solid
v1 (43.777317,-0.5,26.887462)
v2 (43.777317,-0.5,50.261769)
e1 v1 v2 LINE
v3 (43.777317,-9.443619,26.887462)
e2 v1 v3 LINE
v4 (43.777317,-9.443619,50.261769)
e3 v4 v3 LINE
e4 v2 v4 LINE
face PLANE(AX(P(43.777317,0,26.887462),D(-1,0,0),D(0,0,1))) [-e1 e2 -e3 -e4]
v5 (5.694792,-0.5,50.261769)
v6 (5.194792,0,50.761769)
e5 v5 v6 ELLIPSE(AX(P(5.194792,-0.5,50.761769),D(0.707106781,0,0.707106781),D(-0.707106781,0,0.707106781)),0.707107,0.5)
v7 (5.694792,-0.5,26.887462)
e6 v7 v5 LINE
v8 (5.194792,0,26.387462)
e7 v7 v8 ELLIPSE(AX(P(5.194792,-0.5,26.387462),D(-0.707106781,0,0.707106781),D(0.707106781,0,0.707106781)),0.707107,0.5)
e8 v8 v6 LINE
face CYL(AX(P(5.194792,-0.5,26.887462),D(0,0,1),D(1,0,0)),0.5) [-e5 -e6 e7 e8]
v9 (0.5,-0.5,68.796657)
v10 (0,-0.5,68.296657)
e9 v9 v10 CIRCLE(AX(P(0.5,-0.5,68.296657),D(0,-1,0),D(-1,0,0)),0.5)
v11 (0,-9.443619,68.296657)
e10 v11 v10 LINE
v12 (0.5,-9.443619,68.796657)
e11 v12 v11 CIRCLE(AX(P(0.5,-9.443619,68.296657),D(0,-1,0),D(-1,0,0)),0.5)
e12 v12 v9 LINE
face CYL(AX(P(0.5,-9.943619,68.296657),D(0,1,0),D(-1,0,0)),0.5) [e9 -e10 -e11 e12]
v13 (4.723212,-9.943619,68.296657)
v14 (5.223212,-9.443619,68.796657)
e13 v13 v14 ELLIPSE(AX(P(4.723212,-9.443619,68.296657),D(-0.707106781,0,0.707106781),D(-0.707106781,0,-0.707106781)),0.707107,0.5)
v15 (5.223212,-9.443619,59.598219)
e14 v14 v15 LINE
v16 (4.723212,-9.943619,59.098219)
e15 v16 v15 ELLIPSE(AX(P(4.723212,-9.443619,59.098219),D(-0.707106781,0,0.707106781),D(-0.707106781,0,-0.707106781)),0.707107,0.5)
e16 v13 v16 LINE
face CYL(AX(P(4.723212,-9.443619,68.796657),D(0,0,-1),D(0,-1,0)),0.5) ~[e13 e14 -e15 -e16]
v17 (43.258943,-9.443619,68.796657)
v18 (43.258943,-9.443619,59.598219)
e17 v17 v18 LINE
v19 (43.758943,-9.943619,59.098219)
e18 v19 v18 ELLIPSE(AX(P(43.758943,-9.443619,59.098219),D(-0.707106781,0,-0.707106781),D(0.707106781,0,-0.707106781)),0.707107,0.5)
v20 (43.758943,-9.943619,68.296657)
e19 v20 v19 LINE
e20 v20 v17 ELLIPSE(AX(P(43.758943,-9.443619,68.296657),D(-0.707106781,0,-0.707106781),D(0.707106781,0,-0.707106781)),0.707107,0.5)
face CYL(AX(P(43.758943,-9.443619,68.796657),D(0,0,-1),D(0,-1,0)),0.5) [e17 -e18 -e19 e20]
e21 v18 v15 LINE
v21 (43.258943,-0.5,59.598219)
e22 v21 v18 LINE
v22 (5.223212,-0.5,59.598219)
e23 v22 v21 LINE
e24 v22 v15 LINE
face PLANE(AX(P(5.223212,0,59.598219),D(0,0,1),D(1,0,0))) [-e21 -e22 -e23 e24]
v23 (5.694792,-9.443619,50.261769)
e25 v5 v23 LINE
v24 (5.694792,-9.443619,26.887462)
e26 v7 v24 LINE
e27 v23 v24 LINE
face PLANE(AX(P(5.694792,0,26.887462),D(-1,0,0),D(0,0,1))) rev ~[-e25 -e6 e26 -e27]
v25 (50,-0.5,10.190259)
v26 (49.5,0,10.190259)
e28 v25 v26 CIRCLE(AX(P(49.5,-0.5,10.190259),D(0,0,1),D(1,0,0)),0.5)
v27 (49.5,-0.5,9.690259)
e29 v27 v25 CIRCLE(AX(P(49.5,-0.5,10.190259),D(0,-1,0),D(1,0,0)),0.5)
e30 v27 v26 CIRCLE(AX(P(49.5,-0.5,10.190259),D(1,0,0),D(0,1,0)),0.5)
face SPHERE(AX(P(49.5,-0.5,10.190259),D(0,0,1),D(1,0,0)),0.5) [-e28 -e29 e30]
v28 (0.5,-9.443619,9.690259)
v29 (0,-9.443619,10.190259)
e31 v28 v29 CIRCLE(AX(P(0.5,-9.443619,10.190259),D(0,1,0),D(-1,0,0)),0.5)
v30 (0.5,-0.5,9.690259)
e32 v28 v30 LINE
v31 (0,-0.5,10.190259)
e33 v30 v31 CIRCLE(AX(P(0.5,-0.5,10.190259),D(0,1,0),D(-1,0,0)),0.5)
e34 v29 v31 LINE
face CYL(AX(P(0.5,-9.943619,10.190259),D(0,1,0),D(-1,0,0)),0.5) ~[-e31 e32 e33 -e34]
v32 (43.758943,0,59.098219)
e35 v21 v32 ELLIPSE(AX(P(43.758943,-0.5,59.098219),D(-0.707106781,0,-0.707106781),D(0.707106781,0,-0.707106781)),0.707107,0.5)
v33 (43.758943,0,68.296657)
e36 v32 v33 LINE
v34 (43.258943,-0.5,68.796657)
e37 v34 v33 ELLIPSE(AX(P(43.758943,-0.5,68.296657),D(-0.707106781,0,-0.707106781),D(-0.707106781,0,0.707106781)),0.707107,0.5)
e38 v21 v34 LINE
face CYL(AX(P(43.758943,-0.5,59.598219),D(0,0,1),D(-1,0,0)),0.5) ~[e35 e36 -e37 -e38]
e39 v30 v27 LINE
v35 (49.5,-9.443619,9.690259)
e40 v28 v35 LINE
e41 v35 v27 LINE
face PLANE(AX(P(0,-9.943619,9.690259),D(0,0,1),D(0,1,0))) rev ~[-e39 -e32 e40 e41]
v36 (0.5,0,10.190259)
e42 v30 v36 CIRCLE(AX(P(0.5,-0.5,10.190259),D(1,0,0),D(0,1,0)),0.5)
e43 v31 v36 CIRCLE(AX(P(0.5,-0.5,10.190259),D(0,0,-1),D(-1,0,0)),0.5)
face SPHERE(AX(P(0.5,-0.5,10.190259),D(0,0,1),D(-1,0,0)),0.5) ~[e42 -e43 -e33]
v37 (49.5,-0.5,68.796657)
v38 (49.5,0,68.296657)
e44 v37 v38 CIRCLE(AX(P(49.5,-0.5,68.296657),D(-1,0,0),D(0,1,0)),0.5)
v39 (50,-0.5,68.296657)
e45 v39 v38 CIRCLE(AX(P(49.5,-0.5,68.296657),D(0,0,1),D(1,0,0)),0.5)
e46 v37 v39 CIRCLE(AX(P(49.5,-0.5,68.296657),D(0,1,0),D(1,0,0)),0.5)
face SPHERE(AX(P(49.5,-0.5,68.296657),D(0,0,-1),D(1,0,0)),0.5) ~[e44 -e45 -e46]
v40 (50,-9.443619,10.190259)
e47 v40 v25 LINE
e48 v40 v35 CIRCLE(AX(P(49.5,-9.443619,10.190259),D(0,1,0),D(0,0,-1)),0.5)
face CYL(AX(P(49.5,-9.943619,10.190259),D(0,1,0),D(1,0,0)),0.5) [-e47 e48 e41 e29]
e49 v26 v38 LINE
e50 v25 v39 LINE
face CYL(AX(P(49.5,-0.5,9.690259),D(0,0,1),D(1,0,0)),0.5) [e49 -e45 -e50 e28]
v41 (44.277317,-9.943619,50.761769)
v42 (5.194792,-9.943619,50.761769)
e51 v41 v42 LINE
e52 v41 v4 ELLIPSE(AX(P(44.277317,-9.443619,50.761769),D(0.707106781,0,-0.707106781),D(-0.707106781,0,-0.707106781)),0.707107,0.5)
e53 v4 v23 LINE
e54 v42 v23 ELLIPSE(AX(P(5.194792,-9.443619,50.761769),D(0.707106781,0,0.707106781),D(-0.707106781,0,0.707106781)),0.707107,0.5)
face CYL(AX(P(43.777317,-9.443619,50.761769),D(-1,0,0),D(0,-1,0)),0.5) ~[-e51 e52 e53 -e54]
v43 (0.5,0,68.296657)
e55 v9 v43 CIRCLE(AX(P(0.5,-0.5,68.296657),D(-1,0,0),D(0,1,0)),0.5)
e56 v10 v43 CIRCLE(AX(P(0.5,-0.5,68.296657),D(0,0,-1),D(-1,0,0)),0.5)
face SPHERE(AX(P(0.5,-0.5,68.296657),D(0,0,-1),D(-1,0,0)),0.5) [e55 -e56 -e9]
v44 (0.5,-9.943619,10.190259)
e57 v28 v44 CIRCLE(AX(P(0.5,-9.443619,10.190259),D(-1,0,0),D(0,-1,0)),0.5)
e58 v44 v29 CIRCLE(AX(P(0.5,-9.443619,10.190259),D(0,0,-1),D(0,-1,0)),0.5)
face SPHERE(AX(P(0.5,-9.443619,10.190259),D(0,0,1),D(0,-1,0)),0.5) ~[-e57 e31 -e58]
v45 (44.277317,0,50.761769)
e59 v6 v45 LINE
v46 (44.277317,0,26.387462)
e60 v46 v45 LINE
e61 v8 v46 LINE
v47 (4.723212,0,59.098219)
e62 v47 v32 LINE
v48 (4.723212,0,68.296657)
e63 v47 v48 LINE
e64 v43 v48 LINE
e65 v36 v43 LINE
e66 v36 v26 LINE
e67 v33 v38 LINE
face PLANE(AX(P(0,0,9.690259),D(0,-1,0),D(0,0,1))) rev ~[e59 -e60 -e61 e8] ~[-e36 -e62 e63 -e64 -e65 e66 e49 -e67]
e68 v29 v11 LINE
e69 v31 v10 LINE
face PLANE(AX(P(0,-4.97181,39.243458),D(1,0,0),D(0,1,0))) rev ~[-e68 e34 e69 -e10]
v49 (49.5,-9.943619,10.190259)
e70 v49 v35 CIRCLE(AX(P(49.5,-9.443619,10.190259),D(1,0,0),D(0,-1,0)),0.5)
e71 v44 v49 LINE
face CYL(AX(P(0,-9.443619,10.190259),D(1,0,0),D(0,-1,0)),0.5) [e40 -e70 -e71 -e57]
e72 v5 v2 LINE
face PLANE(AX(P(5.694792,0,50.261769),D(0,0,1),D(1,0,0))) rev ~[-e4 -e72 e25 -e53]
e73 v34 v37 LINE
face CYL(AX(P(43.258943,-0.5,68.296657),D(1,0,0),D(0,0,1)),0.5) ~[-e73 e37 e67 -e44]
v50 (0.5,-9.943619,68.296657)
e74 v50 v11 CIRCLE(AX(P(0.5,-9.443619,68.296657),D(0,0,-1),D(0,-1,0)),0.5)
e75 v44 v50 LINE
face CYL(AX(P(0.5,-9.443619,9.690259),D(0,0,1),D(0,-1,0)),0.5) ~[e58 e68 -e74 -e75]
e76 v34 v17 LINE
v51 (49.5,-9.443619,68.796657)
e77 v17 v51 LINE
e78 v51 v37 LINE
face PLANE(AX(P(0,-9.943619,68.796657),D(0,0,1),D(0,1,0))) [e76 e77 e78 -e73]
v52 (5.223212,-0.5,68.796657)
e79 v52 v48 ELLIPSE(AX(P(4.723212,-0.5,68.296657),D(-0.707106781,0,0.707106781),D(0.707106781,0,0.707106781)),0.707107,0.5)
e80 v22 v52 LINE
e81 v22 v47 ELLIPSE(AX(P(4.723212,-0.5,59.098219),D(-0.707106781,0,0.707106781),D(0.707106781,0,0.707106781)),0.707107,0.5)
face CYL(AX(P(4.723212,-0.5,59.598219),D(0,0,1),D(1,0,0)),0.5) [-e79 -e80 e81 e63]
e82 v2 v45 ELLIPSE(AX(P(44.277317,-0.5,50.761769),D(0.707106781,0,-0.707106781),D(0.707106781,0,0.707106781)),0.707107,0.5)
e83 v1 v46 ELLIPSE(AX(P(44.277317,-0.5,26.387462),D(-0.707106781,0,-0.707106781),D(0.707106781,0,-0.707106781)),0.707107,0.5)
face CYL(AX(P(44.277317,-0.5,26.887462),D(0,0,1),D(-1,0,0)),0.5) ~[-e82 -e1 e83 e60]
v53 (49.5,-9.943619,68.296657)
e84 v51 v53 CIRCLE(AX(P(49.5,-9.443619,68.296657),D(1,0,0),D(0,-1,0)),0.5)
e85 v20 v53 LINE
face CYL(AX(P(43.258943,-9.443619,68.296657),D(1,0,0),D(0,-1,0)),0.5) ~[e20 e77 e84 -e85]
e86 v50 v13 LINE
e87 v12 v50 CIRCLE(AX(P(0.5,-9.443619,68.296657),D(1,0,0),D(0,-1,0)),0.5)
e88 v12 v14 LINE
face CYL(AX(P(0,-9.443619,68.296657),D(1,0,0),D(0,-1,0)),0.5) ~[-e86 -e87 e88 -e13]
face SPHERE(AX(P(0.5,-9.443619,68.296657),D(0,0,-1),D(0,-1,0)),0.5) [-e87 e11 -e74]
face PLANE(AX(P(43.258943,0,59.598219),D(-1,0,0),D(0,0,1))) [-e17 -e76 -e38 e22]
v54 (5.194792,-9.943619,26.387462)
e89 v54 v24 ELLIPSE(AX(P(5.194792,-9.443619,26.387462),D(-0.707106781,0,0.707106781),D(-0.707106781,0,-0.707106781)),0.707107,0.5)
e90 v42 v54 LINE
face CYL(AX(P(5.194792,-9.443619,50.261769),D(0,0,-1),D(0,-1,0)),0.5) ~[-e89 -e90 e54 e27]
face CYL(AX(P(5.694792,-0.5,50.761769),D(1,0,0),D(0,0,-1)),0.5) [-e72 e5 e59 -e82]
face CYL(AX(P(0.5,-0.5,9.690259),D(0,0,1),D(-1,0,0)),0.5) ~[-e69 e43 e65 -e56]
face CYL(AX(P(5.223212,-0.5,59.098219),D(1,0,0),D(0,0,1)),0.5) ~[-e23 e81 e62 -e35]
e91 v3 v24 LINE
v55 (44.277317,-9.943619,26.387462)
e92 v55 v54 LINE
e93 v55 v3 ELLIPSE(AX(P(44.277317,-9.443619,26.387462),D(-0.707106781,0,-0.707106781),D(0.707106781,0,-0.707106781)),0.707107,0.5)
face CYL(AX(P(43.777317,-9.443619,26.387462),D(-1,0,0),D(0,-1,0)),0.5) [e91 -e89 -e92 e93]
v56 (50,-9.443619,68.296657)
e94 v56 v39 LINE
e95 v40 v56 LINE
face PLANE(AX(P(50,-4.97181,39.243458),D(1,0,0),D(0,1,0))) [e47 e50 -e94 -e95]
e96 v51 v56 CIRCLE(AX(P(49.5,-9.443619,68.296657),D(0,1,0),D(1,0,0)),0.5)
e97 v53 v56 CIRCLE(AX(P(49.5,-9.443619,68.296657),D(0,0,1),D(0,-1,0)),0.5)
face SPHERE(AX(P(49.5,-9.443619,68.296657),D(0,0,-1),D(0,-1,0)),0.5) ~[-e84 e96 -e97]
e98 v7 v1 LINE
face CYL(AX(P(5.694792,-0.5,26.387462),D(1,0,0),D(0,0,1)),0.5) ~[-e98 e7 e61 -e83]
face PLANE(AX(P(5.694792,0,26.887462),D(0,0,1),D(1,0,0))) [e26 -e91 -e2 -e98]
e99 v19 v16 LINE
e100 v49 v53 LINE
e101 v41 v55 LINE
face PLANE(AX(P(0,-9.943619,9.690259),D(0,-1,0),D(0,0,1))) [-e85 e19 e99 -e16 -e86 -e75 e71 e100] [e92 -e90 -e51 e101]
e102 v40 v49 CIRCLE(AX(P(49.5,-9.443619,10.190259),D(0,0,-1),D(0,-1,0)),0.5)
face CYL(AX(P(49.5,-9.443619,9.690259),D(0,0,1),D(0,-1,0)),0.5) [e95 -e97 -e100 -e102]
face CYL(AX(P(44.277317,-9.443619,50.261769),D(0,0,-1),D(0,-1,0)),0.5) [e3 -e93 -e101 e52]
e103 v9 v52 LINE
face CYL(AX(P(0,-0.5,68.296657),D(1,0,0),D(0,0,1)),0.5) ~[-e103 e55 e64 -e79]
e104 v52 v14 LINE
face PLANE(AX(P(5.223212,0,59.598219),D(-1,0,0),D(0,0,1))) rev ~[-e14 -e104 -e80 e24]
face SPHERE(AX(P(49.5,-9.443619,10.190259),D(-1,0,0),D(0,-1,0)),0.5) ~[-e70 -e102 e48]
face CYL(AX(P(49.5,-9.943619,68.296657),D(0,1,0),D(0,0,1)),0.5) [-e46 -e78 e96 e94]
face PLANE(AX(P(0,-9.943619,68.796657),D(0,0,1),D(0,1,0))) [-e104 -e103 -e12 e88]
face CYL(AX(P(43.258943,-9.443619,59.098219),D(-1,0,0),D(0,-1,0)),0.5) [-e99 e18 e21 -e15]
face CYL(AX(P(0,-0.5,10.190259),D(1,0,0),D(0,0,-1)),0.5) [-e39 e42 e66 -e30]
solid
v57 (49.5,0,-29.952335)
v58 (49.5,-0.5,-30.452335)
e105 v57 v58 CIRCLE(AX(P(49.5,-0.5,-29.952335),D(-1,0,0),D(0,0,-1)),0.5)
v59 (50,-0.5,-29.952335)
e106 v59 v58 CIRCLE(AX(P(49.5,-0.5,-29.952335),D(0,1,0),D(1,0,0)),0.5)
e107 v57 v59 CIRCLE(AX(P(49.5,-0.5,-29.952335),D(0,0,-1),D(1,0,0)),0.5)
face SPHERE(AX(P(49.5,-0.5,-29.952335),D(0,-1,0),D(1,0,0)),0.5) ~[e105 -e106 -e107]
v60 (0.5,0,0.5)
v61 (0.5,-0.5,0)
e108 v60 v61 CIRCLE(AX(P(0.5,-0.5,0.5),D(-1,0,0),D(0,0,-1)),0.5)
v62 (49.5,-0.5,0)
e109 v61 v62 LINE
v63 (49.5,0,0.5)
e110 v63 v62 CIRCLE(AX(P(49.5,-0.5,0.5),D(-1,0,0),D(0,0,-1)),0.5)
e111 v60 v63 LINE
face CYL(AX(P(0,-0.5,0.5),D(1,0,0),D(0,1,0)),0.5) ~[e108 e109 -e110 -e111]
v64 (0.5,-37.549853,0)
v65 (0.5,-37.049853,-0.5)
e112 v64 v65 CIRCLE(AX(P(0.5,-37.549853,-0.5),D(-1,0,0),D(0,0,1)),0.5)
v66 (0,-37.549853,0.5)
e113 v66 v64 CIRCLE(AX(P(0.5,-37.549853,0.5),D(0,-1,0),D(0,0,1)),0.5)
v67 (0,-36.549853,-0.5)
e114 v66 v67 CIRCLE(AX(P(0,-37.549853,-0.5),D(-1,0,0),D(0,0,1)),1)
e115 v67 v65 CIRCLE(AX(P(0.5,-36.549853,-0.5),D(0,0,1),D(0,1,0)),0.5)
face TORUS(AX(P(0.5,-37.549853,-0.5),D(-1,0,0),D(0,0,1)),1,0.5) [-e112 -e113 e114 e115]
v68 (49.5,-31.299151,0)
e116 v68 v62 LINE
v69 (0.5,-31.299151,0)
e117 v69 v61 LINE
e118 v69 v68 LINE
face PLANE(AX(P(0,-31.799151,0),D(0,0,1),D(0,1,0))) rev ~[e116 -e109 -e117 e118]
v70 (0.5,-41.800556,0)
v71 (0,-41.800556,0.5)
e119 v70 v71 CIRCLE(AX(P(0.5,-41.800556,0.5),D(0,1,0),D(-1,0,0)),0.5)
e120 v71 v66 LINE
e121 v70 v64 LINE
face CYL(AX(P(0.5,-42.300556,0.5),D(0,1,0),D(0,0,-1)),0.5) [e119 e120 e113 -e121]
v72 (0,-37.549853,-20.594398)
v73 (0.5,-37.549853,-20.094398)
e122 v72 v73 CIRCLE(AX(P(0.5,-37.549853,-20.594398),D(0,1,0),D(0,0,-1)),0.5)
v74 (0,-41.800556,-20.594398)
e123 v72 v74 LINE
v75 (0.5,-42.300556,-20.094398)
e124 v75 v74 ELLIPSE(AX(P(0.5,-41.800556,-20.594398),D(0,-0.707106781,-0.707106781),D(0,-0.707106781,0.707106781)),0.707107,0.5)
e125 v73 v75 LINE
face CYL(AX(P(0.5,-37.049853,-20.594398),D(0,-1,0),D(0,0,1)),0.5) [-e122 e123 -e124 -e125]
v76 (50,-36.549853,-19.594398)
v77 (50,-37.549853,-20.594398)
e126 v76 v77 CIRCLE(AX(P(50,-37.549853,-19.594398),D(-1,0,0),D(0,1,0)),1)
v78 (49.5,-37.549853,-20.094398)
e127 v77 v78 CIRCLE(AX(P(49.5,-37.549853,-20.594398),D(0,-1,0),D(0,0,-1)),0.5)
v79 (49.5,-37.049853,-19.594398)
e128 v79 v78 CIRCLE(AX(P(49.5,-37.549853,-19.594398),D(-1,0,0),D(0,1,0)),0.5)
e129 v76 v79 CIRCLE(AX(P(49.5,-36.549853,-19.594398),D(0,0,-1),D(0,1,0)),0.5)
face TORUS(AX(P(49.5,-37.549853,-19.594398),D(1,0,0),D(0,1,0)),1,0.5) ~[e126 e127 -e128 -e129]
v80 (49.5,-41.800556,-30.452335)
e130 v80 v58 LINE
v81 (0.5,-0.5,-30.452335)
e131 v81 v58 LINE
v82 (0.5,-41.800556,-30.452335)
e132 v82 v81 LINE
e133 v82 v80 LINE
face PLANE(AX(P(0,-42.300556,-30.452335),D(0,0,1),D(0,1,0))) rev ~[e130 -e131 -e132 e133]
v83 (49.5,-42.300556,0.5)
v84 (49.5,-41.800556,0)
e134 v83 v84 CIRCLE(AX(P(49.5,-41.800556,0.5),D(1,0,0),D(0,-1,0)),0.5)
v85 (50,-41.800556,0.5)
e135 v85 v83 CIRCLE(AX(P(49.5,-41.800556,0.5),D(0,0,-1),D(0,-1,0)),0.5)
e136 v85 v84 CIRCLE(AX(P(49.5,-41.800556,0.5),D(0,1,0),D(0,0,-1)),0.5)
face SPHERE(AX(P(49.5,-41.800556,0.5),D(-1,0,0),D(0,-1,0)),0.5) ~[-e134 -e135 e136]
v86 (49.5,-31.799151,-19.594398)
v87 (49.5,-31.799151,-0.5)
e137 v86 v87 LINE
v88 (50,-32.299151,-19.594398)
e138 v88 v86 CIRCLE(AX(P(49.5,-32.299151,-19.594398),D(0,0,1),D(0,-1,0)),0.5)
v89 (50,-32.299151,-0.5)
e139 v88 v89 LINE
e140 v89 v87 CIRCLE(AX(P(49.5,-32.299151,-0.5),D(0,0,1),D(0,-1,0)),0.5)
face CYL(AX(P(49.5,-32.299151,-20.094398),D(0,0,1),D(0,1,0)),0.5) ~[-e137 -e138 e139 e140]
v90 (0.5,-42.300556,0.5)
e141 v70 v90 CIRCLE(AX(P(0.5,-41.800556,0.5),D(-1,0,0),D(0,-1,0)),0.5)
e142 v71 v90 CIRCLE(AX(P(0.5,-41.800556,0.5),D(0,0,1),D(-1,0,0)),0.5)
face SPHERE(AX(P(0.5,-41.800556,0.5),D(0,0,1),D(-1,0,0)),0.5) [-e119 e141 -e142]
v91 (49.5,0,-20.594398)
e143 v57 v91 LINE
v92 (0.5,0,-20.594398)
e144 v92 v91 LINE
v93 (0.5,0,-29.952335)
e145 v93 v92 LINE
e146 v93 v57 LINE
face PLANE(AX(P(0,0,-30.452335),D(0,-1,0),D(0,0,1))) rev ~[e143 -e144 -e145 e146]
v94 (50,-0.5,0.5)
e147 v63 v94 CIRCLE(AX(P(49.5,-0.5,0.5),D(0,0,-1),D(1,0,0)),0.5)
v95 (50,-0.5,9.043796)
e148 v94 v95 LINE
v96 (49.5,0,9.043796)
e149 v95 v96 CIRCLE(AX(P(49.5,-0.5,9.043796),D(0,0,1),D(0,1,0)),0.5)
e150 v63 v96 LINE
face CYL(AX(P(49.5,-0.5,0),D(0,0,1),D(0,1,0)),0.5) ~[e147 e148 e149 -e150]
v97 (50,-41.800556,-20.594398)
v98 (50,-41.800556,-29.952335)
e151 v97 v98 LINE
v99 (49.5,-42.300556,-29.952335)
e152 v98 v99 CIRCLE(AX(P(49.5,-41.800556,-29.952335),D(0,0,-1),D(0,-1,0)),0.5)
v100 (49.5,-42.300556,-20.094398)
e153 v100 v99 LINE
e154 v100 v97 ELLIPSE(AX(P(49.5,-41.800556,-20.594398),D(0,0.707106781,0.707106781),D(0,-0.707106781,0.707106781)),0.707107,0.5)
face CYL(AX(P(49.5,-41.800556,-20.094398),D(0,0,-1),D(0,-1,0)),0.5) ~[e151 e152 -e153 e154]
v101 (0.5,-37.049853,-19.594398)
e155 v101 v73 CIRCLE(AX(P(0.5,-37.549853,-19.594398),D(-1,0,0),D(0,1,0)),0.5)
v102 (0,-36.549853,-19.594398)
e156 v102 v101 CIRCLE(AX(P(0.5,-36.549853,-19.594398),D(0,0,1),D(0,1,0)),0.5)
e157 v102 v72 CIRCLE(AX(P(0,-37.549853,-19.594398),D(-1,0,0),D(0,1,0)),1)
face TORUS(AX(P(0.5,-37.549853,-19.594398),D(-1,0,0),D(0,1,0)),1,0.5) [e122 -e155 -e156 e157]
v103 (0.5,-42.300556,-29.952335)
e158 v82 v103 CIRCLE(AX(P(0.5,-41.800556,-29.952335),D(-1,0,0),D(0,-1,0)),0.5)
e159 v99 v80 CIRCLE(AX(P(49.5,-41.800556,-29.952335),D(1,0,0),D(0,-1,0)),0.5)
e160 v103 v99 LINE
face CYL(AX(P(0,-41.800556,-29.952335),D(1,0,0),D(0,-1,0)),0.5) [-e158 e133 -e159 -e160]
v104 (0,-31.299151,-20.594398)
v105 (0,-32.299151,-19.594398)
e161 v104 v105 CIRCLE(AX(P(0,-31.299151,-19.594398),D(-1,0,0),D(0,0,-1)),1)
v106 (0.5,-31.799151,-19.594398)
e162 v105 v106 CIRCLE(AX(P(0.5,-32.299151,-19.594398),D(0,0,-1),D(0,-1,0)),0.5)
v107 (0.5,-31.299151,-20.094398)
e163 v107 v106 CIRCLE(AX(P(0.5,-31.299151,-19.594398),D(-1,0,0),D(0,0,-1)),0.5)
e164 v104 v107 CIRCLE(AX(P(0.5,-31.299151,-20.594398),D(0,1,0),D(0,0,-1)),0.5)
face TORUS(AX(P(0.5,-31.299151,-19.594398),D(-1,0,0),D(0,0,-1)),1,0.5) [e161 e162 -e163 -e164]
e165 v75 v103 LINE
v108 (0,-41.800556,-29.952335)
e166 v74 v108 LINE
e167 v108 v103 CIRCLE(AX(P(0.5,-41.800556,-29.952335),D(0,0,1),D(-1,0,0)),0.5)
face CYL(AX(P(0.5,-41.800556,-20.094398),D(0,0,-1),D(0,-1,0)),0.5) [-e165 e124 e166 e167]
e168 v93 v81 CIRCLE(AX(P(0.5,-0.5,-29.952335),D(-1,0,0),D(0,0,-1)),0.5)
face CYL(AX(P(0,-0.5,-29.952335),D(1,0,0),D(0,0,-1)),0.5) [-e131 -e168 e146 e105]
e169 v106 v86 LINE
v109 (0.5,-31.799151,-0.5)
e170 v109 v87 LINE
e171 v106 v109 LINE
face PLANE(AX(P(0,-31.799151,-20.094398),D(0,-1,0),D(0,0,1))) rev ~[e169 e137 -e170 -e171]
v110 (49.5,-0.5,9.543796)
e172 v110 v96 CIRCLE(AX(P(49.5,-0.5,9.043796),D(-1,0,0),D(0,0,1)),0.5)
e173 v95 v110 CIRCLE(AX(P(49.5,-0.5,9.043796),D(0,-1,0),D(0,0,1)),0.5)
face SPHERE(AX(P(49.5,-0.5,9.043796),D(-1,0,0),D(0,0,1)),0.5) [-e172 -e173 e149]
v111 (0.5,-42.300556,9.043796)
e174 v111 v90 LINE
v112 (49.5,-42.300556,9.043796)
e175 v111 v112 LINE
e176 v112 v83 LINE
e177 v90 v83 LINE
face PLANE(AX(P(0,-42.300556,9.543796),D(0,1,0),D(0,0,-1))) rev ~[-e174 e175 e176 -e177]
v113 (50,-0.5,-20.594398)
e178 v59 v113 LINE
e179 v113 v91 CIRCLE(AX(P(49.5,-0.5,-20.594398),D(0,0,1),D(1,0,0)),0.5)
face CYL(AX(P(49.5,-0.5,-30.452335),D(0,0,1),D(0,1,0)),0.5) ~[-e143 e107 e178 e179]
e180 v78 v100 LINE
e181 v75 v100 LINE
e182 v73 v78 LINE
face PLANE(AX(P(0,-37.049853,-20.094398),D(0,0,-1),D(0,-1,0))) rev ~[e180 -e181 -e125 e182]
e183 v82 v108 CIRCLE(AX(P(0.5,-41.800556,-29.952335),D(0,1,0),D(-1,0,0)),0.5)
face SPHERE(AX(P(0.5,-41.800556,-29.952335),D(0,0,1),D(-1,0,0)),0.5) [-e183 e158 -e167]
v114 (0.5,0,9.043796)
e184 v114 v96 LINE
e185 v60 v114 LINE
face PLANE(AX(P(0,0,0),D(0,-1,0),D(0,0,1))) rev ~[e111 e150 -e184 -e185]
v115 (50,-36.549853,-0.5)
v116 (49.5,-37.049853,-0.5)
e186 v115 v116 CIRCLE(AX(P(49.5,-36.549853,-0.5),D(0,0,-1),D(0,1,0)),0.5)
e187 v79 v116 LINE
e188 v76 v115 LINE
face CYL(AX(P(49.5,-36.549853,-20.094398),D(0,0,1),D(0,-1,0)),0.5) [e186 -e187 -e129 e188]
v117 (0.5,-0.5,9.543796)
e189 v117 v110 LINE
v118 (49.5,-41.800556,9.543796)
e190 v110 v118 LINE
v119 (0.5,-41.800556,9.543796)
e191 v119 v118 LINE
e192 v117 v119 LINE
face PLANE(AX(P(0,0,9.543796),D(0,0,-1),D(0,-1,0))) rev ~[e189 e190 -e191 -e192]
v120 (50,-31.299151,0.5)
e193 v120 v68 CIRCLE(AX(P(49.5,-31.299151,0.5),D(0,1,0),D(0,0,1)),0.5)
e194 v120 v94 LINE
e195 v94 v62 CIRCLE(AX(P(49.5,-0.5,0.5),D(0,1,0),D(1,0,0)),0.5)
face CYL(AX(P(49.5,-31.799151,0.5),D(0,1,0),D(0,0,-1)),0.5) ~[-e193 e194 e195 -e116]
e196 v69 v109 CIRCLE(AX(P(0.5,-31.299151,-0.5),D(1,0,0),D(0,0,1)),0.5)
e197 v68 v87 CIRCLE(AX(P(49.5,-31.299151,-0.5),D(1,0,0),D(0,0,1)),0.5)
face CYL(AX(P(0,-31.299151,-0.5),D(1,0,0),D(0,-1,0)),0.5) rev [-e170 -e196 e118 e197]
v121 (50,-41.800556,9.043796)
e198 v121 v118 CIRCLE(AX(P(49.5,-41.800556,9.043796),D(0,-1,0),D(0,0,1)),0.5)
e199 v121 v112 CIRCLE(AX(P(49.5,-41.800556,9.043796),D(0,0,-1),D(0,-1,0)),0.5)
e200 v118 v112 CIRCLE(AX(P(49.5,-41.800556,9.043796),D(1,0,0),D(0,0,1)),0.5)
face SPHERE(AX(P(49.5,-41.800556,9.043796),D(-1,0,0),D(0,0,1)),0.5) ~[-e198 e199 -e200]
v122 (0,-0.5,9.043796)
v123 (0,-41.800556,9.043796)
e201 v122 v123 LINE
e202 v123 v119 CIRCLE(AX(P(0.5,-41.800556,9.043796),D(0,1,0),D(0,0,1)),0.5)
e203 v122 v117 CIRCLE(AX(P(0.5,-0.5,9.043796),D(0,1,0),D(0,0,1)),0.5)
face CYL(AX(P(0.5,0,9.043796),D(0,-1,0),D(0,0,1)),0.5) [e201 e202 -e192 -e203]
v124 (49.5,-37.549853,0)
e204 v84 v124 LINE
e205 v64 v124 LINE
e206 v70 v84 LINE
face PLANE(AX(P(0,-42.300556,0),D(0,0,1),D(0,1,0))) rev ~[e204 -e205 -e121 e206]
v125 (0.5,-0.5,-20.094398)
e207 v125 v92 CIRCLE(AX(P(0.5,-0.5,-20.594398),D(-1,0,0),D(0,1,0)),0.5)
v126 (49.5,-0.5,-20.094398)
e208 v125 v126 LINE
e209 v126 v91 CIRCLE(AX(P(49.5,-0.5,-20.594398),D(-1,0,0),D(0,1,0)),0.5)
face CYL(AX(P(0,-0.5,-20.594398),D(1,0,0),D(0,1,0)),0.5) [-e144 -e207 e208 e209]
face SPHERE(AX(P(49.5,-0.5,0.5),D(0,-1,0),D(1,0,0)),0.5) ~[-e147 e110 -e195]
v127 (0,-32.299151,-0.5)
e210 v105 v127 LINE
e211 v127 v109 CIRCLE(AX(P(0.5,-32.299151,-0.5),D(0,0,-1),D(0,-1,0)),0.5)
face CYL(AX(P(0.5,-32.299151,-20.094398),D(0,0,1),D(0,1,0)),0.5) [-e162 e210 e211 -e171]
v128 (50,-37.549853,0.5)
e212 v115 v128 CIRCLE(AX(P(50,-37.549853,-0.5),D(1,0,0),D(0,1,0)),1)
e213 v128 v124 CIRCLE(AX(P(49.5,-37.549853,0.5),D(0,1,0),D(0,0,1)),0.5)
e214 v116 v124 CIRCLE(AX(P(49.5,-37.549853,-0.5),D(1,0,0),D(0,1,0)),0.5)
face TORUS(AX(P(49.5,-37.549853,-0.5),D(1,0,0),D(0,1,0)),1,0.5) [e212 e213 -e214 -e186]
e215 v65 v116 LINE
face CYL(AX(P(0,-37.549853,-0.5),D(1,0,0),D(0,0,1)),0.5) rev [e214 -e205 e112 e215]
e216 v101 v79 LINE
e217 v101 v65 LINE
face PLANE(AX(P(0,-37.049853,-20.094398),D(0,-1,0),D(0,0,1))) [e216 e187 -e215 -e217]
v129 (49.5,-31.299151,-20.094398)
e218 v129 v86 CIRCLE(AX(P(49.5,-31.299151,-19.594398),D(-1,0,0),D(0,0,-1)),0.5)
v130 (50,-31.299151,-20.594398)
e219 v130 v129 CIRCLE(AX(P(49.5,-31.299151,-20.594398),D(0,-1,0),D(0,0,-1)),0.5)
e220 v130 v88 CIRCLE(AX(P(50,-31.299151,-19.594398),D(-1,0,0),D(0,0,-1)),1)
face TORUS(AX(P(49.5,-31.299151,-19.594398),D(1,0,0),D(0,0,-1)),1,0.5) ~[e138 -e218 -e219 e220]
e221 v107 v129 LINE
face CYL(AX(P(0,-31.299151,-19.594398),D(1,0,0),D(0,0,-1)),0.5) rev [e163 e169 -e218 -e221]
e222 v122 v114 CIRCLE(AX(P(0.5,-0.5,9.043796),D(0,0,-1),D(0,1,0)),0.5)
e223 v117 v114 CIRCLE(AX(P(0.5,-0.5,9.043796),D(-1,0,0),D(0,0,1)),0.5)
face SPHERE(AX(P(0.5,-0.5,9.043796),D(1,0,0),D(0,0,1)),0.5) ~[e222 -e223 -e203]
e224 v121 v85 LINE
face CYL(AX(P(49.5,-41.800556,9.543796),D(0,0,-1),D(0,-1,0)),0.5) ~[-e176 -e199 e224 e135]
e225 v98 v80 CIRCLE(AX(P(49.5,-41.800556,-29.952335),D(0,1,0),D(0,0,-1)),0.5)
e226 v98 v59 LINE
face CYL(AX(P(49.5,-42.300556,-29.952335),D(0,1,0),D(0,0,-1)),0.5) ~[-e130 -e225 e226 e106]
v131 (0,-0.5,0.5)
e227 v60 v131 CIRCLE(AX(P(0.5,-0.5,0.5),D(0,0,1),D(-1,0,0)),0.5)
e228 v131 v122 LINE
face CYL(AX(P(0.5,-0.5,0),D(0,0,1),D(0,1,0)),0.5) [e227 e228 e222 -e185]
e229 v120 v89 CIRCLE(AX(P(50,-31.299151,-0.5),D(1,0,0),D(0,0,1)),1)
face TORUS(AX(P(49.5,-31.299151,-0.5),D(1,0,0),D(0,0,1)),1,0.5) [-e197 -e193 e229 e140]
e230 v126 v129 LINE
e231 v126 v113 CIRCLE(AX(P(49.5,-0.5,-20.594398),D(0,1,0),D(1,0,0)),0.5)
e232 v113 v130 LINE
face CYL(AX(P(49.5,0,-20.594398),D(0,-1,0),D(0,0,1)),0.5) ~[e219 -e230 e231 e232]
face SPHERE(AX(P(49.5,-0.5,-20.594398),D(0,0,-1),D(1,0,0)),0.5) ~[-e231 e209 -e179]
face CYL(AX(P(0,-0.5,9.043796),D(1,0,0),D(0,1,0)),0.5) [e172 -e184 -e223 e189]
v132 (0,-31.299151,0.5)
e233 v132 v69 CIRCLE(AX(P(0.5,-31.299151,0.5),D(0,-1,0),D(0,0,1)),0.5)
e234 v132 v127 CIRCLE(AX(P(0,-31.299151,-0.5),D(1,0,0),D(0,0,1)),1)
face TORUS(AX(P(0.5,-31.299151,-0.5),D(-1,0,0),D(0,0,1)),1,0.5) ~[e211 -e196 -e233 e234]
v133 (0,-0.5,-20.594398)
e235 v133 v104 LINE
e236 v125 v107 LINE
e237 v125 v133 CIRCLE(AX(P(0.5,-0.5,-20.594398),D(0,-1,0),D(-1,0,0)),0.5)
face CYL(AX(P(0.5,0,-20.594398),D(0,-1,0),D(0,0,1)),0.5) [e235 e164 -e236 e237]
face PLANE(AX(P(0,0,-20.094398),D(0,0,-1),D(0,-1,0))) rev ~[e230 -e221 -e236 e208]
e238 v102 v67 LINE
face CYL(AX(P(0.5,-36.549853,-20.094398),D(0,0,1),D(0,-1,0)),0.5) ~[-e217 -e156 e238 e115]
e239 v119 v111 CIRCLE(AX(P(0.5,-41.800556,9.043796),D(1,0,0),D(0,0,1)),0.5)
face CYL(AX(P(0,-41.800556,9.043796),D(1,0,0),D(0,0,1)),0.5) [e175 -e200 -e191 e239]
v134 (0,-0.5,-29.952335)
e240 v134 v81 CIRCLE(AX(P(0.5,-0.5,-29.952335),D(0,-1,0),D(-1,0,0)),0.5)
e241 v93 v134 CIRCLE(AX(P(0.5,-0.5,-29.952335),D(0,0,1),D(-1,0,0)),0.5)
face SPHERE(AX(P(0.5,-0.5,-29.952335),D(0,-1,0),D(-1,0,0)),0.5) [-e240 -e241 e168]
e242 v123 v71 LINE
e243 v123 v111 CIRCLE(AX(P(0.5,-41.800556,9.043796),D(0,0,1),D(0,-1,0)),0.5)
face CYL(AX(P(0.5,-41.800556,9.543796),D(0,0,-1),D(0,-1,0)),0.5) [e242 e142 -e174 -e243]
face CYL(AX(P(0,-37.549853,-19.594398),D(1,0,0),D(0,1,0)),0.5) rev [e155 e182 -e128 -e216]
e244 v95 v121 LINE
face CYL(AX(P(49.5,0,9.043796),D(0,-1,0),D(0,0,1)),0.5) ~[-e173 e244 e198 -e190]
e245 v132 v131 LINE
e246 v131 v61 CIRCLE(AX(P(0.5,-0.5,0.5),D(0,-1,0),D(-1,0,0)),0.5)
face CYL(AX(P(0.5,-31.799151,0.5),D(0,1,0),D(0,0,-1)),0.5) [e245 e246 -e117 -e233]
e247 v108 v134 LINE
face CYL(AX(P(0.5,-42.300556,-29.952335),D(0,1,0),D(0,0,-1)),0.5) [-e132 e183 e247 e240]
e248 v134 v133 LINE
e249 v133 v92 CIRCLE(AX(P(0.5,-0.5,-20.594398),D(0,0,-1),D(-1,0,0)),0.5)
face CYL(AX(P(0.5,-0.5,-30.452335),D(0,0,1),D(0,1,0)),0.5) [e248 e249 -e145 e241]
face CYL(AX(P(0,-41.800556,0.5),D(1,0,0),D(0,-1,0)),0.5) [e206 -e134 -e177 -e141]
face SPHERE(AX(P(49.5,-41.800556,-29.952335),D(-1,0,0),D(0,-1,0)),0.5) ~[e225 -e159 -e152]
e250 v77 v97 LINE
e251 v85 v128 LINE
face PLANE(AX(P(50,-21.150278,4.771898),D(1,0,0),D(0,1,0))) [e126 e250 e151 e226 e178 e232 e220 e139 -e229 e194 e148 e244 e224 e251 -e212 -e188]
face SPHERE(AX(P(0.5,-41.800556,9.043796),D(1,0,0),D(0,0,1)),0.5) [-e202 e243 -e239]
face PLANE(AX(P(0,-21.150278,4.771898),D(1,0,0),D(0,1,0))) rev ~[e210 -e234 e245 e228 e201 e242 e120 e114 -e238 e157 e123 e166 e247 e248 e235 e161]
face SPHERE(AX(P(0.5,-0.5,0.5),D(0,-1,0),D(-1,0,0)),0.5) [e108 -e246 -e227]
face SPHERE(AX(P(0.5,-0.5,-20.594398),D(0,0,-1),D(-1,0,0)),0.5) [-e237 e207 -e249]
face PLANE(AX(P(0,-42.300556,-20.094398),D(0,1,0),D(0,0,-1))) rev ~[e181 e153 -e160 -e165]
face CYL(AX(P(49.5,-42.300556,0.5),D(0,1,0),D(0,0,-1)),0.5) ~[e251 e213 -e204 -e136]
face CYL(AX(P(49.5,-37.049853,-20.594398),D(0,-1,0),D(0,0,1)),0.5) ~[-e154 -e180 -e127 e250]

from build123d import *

# Parameters (mm, degrees)
F0_W     = 9.9436193705
F0_H     = 59.1063983738
F1_DEPTH = 50
F0_W_2   = 5.2507026121
F0_H_2   = 20.0943984091
F2_W     = 38.0825251341
F2_H     = 23.3743079007
F2_W_2   = 38.0357308313
F2_H_2   = 12.3214237392
F3_DEPTH = 25
F4_R     = 0.5
F4_2_R   = 0.5


with BuildPart() as f1:
    # F0 (on Right) → F1 (new body)
    with BuildSketch(Plane.YZ):
        with Locations((-4.9718096852, 39.2434578389)):
            Rectangle(F0_W, F0_H)
    extrude(amount=F1_DEPTH)

    # F2 (on Front) → F3 (cut)
    with BuildSketch(Plane.XZ):
        with Locations((24.7360542417, 38.5746154934)):
            Rectangle(F2_W, F2_H)
        with Locations((24.241077248, 65.7589305192)):
            Rectangle(F2_W_2, F2_H_2)
    extrude(amount=F3_DEPTH, mode=Mode.SUBTRACT)

    # F4
    f4_edges = [f1.edges().sort_by_distance(p)[0] for p in [
        (0, -9.943619, 39.243458),
        (25, -9.943619, 9.690259),
        (50, -9.943619, 39.243458),
        (46.629471, -9.943619, 68.796657),
        (43.258943, -9.943619, 64.197438),
        (24.241077, -9.943619, 59.598219),
        (5.223212, -9.943619, 64.197438),
        (2.611606, -9.943619, 68.796657),
        (24.736054, -9.943619, 50.261769),
        (43.777317, -9.943619, 38.574615),
        (24.736054, -9.943619, 26.887462),
        (5.694792, -9.943619, 38.574615),
        (0, 0, 39.243458),
        (0, -4.97181, 68.796657),
        (0, -4.97181, 9.690259),
        (50, 0, 39.243458),
        (50, -4.97181, 68.796657),
        (50, -4.97181, 9.690259),
        (2.611606, 0, 68.796657),
        (5.223212, 0, 64.197438),
        (24.241077, 0, 59.598219),
        (43.258943, 0, 64.197438),
        (46.629471, 0, 68.796657),
        (25, 0, 9.690259),
        (5.694792, 0, 38.574615),
        (24.736054, 0, 26.887462),
        (43.777317, 0, 38.574615),
        (24.736054, 0, 50.261769),
    ]]
    fillet(f4_edges, radius=F4_R)


with BuildPart() as f1b:
    # F0 (on Right) → F1, piece 2 (new body)
    with BuildSketch(Plane.YZ):
        Polygon((-31.7991506308, 0), (0, 0), (0, 9.5437960699), (-42.300555855, 9.5437960699), (-42.300555855, 0), (-37.0498532429, 0), align=None)
        with Locations((-34.4245019369, -10.0471992046)):
            Rectangle(F0_W_2, F0_H_2)
        Polygon((0, -20.0943984091), (-31.7991506308, -20.0943984091), (-37.0498532429, -20.0943984091), (-42.300555855, -20.0943984091), (-42.300555855, -30.4523352534), (0, -30.4523352534), align=None)
    extrude(amount=F1_DEPTH)

    # F4#2
    f4_2_edges = [f1b.edges().sort_by_distance(p)[0] for p in [
        (25, 0, 9.543796),
        (25, -42.300556, 9.543796),
        (0, -21.150278, 9.543796),
        (50, -21.150278, 9.543796),
        (0, -15.899575, 0),
        (0, 0, 4.771898),
        (0, -42.300556, 4.771898),
        (0, -39.675205, 0),
        (0, -37.049853, -10.047199),
        (0, -39.675205, -20.094398),
        (0, -42.300556, -25.273367),
        (0, -21.150278, -30.452335),
        (0, 0, -25.273367),
        (0, -15.899575, -20.094398),
        (0, -31.799151, -10.047199),
        (25, -42.300556, 0),
        (25, -37.049853, 0),
        (25, -37.049853, -20.094398),
        (50, -37.049853, -10.047199),
        (25, -42.300556, -30.452335),
        (50, -15.899575, 0),
        (50, 0, 4.771898),
        (50, -42.300556, 4.771898),
        (50, -39.675205, 0),
        (50, -39.675205, -20.094398),
        (50, -42.300556, -25.273367),
        (50, -21.150278, -30.452335),
        (50, 0, -25.273367),
        (50, -15.899575, -20.094398),
        (50, -31.799151, -10.047199),
        (25, 0, 0),
        (25, -31.799151, -20.094398),
        (25, -31.799151, 0),
        (25, 0, -20.094398),
        (25, 0, -30.452335),
    ]]
    fillet(f4_2_edges, radius=F4_2_R)


solid = Compound([f1.part, f1b.part])
